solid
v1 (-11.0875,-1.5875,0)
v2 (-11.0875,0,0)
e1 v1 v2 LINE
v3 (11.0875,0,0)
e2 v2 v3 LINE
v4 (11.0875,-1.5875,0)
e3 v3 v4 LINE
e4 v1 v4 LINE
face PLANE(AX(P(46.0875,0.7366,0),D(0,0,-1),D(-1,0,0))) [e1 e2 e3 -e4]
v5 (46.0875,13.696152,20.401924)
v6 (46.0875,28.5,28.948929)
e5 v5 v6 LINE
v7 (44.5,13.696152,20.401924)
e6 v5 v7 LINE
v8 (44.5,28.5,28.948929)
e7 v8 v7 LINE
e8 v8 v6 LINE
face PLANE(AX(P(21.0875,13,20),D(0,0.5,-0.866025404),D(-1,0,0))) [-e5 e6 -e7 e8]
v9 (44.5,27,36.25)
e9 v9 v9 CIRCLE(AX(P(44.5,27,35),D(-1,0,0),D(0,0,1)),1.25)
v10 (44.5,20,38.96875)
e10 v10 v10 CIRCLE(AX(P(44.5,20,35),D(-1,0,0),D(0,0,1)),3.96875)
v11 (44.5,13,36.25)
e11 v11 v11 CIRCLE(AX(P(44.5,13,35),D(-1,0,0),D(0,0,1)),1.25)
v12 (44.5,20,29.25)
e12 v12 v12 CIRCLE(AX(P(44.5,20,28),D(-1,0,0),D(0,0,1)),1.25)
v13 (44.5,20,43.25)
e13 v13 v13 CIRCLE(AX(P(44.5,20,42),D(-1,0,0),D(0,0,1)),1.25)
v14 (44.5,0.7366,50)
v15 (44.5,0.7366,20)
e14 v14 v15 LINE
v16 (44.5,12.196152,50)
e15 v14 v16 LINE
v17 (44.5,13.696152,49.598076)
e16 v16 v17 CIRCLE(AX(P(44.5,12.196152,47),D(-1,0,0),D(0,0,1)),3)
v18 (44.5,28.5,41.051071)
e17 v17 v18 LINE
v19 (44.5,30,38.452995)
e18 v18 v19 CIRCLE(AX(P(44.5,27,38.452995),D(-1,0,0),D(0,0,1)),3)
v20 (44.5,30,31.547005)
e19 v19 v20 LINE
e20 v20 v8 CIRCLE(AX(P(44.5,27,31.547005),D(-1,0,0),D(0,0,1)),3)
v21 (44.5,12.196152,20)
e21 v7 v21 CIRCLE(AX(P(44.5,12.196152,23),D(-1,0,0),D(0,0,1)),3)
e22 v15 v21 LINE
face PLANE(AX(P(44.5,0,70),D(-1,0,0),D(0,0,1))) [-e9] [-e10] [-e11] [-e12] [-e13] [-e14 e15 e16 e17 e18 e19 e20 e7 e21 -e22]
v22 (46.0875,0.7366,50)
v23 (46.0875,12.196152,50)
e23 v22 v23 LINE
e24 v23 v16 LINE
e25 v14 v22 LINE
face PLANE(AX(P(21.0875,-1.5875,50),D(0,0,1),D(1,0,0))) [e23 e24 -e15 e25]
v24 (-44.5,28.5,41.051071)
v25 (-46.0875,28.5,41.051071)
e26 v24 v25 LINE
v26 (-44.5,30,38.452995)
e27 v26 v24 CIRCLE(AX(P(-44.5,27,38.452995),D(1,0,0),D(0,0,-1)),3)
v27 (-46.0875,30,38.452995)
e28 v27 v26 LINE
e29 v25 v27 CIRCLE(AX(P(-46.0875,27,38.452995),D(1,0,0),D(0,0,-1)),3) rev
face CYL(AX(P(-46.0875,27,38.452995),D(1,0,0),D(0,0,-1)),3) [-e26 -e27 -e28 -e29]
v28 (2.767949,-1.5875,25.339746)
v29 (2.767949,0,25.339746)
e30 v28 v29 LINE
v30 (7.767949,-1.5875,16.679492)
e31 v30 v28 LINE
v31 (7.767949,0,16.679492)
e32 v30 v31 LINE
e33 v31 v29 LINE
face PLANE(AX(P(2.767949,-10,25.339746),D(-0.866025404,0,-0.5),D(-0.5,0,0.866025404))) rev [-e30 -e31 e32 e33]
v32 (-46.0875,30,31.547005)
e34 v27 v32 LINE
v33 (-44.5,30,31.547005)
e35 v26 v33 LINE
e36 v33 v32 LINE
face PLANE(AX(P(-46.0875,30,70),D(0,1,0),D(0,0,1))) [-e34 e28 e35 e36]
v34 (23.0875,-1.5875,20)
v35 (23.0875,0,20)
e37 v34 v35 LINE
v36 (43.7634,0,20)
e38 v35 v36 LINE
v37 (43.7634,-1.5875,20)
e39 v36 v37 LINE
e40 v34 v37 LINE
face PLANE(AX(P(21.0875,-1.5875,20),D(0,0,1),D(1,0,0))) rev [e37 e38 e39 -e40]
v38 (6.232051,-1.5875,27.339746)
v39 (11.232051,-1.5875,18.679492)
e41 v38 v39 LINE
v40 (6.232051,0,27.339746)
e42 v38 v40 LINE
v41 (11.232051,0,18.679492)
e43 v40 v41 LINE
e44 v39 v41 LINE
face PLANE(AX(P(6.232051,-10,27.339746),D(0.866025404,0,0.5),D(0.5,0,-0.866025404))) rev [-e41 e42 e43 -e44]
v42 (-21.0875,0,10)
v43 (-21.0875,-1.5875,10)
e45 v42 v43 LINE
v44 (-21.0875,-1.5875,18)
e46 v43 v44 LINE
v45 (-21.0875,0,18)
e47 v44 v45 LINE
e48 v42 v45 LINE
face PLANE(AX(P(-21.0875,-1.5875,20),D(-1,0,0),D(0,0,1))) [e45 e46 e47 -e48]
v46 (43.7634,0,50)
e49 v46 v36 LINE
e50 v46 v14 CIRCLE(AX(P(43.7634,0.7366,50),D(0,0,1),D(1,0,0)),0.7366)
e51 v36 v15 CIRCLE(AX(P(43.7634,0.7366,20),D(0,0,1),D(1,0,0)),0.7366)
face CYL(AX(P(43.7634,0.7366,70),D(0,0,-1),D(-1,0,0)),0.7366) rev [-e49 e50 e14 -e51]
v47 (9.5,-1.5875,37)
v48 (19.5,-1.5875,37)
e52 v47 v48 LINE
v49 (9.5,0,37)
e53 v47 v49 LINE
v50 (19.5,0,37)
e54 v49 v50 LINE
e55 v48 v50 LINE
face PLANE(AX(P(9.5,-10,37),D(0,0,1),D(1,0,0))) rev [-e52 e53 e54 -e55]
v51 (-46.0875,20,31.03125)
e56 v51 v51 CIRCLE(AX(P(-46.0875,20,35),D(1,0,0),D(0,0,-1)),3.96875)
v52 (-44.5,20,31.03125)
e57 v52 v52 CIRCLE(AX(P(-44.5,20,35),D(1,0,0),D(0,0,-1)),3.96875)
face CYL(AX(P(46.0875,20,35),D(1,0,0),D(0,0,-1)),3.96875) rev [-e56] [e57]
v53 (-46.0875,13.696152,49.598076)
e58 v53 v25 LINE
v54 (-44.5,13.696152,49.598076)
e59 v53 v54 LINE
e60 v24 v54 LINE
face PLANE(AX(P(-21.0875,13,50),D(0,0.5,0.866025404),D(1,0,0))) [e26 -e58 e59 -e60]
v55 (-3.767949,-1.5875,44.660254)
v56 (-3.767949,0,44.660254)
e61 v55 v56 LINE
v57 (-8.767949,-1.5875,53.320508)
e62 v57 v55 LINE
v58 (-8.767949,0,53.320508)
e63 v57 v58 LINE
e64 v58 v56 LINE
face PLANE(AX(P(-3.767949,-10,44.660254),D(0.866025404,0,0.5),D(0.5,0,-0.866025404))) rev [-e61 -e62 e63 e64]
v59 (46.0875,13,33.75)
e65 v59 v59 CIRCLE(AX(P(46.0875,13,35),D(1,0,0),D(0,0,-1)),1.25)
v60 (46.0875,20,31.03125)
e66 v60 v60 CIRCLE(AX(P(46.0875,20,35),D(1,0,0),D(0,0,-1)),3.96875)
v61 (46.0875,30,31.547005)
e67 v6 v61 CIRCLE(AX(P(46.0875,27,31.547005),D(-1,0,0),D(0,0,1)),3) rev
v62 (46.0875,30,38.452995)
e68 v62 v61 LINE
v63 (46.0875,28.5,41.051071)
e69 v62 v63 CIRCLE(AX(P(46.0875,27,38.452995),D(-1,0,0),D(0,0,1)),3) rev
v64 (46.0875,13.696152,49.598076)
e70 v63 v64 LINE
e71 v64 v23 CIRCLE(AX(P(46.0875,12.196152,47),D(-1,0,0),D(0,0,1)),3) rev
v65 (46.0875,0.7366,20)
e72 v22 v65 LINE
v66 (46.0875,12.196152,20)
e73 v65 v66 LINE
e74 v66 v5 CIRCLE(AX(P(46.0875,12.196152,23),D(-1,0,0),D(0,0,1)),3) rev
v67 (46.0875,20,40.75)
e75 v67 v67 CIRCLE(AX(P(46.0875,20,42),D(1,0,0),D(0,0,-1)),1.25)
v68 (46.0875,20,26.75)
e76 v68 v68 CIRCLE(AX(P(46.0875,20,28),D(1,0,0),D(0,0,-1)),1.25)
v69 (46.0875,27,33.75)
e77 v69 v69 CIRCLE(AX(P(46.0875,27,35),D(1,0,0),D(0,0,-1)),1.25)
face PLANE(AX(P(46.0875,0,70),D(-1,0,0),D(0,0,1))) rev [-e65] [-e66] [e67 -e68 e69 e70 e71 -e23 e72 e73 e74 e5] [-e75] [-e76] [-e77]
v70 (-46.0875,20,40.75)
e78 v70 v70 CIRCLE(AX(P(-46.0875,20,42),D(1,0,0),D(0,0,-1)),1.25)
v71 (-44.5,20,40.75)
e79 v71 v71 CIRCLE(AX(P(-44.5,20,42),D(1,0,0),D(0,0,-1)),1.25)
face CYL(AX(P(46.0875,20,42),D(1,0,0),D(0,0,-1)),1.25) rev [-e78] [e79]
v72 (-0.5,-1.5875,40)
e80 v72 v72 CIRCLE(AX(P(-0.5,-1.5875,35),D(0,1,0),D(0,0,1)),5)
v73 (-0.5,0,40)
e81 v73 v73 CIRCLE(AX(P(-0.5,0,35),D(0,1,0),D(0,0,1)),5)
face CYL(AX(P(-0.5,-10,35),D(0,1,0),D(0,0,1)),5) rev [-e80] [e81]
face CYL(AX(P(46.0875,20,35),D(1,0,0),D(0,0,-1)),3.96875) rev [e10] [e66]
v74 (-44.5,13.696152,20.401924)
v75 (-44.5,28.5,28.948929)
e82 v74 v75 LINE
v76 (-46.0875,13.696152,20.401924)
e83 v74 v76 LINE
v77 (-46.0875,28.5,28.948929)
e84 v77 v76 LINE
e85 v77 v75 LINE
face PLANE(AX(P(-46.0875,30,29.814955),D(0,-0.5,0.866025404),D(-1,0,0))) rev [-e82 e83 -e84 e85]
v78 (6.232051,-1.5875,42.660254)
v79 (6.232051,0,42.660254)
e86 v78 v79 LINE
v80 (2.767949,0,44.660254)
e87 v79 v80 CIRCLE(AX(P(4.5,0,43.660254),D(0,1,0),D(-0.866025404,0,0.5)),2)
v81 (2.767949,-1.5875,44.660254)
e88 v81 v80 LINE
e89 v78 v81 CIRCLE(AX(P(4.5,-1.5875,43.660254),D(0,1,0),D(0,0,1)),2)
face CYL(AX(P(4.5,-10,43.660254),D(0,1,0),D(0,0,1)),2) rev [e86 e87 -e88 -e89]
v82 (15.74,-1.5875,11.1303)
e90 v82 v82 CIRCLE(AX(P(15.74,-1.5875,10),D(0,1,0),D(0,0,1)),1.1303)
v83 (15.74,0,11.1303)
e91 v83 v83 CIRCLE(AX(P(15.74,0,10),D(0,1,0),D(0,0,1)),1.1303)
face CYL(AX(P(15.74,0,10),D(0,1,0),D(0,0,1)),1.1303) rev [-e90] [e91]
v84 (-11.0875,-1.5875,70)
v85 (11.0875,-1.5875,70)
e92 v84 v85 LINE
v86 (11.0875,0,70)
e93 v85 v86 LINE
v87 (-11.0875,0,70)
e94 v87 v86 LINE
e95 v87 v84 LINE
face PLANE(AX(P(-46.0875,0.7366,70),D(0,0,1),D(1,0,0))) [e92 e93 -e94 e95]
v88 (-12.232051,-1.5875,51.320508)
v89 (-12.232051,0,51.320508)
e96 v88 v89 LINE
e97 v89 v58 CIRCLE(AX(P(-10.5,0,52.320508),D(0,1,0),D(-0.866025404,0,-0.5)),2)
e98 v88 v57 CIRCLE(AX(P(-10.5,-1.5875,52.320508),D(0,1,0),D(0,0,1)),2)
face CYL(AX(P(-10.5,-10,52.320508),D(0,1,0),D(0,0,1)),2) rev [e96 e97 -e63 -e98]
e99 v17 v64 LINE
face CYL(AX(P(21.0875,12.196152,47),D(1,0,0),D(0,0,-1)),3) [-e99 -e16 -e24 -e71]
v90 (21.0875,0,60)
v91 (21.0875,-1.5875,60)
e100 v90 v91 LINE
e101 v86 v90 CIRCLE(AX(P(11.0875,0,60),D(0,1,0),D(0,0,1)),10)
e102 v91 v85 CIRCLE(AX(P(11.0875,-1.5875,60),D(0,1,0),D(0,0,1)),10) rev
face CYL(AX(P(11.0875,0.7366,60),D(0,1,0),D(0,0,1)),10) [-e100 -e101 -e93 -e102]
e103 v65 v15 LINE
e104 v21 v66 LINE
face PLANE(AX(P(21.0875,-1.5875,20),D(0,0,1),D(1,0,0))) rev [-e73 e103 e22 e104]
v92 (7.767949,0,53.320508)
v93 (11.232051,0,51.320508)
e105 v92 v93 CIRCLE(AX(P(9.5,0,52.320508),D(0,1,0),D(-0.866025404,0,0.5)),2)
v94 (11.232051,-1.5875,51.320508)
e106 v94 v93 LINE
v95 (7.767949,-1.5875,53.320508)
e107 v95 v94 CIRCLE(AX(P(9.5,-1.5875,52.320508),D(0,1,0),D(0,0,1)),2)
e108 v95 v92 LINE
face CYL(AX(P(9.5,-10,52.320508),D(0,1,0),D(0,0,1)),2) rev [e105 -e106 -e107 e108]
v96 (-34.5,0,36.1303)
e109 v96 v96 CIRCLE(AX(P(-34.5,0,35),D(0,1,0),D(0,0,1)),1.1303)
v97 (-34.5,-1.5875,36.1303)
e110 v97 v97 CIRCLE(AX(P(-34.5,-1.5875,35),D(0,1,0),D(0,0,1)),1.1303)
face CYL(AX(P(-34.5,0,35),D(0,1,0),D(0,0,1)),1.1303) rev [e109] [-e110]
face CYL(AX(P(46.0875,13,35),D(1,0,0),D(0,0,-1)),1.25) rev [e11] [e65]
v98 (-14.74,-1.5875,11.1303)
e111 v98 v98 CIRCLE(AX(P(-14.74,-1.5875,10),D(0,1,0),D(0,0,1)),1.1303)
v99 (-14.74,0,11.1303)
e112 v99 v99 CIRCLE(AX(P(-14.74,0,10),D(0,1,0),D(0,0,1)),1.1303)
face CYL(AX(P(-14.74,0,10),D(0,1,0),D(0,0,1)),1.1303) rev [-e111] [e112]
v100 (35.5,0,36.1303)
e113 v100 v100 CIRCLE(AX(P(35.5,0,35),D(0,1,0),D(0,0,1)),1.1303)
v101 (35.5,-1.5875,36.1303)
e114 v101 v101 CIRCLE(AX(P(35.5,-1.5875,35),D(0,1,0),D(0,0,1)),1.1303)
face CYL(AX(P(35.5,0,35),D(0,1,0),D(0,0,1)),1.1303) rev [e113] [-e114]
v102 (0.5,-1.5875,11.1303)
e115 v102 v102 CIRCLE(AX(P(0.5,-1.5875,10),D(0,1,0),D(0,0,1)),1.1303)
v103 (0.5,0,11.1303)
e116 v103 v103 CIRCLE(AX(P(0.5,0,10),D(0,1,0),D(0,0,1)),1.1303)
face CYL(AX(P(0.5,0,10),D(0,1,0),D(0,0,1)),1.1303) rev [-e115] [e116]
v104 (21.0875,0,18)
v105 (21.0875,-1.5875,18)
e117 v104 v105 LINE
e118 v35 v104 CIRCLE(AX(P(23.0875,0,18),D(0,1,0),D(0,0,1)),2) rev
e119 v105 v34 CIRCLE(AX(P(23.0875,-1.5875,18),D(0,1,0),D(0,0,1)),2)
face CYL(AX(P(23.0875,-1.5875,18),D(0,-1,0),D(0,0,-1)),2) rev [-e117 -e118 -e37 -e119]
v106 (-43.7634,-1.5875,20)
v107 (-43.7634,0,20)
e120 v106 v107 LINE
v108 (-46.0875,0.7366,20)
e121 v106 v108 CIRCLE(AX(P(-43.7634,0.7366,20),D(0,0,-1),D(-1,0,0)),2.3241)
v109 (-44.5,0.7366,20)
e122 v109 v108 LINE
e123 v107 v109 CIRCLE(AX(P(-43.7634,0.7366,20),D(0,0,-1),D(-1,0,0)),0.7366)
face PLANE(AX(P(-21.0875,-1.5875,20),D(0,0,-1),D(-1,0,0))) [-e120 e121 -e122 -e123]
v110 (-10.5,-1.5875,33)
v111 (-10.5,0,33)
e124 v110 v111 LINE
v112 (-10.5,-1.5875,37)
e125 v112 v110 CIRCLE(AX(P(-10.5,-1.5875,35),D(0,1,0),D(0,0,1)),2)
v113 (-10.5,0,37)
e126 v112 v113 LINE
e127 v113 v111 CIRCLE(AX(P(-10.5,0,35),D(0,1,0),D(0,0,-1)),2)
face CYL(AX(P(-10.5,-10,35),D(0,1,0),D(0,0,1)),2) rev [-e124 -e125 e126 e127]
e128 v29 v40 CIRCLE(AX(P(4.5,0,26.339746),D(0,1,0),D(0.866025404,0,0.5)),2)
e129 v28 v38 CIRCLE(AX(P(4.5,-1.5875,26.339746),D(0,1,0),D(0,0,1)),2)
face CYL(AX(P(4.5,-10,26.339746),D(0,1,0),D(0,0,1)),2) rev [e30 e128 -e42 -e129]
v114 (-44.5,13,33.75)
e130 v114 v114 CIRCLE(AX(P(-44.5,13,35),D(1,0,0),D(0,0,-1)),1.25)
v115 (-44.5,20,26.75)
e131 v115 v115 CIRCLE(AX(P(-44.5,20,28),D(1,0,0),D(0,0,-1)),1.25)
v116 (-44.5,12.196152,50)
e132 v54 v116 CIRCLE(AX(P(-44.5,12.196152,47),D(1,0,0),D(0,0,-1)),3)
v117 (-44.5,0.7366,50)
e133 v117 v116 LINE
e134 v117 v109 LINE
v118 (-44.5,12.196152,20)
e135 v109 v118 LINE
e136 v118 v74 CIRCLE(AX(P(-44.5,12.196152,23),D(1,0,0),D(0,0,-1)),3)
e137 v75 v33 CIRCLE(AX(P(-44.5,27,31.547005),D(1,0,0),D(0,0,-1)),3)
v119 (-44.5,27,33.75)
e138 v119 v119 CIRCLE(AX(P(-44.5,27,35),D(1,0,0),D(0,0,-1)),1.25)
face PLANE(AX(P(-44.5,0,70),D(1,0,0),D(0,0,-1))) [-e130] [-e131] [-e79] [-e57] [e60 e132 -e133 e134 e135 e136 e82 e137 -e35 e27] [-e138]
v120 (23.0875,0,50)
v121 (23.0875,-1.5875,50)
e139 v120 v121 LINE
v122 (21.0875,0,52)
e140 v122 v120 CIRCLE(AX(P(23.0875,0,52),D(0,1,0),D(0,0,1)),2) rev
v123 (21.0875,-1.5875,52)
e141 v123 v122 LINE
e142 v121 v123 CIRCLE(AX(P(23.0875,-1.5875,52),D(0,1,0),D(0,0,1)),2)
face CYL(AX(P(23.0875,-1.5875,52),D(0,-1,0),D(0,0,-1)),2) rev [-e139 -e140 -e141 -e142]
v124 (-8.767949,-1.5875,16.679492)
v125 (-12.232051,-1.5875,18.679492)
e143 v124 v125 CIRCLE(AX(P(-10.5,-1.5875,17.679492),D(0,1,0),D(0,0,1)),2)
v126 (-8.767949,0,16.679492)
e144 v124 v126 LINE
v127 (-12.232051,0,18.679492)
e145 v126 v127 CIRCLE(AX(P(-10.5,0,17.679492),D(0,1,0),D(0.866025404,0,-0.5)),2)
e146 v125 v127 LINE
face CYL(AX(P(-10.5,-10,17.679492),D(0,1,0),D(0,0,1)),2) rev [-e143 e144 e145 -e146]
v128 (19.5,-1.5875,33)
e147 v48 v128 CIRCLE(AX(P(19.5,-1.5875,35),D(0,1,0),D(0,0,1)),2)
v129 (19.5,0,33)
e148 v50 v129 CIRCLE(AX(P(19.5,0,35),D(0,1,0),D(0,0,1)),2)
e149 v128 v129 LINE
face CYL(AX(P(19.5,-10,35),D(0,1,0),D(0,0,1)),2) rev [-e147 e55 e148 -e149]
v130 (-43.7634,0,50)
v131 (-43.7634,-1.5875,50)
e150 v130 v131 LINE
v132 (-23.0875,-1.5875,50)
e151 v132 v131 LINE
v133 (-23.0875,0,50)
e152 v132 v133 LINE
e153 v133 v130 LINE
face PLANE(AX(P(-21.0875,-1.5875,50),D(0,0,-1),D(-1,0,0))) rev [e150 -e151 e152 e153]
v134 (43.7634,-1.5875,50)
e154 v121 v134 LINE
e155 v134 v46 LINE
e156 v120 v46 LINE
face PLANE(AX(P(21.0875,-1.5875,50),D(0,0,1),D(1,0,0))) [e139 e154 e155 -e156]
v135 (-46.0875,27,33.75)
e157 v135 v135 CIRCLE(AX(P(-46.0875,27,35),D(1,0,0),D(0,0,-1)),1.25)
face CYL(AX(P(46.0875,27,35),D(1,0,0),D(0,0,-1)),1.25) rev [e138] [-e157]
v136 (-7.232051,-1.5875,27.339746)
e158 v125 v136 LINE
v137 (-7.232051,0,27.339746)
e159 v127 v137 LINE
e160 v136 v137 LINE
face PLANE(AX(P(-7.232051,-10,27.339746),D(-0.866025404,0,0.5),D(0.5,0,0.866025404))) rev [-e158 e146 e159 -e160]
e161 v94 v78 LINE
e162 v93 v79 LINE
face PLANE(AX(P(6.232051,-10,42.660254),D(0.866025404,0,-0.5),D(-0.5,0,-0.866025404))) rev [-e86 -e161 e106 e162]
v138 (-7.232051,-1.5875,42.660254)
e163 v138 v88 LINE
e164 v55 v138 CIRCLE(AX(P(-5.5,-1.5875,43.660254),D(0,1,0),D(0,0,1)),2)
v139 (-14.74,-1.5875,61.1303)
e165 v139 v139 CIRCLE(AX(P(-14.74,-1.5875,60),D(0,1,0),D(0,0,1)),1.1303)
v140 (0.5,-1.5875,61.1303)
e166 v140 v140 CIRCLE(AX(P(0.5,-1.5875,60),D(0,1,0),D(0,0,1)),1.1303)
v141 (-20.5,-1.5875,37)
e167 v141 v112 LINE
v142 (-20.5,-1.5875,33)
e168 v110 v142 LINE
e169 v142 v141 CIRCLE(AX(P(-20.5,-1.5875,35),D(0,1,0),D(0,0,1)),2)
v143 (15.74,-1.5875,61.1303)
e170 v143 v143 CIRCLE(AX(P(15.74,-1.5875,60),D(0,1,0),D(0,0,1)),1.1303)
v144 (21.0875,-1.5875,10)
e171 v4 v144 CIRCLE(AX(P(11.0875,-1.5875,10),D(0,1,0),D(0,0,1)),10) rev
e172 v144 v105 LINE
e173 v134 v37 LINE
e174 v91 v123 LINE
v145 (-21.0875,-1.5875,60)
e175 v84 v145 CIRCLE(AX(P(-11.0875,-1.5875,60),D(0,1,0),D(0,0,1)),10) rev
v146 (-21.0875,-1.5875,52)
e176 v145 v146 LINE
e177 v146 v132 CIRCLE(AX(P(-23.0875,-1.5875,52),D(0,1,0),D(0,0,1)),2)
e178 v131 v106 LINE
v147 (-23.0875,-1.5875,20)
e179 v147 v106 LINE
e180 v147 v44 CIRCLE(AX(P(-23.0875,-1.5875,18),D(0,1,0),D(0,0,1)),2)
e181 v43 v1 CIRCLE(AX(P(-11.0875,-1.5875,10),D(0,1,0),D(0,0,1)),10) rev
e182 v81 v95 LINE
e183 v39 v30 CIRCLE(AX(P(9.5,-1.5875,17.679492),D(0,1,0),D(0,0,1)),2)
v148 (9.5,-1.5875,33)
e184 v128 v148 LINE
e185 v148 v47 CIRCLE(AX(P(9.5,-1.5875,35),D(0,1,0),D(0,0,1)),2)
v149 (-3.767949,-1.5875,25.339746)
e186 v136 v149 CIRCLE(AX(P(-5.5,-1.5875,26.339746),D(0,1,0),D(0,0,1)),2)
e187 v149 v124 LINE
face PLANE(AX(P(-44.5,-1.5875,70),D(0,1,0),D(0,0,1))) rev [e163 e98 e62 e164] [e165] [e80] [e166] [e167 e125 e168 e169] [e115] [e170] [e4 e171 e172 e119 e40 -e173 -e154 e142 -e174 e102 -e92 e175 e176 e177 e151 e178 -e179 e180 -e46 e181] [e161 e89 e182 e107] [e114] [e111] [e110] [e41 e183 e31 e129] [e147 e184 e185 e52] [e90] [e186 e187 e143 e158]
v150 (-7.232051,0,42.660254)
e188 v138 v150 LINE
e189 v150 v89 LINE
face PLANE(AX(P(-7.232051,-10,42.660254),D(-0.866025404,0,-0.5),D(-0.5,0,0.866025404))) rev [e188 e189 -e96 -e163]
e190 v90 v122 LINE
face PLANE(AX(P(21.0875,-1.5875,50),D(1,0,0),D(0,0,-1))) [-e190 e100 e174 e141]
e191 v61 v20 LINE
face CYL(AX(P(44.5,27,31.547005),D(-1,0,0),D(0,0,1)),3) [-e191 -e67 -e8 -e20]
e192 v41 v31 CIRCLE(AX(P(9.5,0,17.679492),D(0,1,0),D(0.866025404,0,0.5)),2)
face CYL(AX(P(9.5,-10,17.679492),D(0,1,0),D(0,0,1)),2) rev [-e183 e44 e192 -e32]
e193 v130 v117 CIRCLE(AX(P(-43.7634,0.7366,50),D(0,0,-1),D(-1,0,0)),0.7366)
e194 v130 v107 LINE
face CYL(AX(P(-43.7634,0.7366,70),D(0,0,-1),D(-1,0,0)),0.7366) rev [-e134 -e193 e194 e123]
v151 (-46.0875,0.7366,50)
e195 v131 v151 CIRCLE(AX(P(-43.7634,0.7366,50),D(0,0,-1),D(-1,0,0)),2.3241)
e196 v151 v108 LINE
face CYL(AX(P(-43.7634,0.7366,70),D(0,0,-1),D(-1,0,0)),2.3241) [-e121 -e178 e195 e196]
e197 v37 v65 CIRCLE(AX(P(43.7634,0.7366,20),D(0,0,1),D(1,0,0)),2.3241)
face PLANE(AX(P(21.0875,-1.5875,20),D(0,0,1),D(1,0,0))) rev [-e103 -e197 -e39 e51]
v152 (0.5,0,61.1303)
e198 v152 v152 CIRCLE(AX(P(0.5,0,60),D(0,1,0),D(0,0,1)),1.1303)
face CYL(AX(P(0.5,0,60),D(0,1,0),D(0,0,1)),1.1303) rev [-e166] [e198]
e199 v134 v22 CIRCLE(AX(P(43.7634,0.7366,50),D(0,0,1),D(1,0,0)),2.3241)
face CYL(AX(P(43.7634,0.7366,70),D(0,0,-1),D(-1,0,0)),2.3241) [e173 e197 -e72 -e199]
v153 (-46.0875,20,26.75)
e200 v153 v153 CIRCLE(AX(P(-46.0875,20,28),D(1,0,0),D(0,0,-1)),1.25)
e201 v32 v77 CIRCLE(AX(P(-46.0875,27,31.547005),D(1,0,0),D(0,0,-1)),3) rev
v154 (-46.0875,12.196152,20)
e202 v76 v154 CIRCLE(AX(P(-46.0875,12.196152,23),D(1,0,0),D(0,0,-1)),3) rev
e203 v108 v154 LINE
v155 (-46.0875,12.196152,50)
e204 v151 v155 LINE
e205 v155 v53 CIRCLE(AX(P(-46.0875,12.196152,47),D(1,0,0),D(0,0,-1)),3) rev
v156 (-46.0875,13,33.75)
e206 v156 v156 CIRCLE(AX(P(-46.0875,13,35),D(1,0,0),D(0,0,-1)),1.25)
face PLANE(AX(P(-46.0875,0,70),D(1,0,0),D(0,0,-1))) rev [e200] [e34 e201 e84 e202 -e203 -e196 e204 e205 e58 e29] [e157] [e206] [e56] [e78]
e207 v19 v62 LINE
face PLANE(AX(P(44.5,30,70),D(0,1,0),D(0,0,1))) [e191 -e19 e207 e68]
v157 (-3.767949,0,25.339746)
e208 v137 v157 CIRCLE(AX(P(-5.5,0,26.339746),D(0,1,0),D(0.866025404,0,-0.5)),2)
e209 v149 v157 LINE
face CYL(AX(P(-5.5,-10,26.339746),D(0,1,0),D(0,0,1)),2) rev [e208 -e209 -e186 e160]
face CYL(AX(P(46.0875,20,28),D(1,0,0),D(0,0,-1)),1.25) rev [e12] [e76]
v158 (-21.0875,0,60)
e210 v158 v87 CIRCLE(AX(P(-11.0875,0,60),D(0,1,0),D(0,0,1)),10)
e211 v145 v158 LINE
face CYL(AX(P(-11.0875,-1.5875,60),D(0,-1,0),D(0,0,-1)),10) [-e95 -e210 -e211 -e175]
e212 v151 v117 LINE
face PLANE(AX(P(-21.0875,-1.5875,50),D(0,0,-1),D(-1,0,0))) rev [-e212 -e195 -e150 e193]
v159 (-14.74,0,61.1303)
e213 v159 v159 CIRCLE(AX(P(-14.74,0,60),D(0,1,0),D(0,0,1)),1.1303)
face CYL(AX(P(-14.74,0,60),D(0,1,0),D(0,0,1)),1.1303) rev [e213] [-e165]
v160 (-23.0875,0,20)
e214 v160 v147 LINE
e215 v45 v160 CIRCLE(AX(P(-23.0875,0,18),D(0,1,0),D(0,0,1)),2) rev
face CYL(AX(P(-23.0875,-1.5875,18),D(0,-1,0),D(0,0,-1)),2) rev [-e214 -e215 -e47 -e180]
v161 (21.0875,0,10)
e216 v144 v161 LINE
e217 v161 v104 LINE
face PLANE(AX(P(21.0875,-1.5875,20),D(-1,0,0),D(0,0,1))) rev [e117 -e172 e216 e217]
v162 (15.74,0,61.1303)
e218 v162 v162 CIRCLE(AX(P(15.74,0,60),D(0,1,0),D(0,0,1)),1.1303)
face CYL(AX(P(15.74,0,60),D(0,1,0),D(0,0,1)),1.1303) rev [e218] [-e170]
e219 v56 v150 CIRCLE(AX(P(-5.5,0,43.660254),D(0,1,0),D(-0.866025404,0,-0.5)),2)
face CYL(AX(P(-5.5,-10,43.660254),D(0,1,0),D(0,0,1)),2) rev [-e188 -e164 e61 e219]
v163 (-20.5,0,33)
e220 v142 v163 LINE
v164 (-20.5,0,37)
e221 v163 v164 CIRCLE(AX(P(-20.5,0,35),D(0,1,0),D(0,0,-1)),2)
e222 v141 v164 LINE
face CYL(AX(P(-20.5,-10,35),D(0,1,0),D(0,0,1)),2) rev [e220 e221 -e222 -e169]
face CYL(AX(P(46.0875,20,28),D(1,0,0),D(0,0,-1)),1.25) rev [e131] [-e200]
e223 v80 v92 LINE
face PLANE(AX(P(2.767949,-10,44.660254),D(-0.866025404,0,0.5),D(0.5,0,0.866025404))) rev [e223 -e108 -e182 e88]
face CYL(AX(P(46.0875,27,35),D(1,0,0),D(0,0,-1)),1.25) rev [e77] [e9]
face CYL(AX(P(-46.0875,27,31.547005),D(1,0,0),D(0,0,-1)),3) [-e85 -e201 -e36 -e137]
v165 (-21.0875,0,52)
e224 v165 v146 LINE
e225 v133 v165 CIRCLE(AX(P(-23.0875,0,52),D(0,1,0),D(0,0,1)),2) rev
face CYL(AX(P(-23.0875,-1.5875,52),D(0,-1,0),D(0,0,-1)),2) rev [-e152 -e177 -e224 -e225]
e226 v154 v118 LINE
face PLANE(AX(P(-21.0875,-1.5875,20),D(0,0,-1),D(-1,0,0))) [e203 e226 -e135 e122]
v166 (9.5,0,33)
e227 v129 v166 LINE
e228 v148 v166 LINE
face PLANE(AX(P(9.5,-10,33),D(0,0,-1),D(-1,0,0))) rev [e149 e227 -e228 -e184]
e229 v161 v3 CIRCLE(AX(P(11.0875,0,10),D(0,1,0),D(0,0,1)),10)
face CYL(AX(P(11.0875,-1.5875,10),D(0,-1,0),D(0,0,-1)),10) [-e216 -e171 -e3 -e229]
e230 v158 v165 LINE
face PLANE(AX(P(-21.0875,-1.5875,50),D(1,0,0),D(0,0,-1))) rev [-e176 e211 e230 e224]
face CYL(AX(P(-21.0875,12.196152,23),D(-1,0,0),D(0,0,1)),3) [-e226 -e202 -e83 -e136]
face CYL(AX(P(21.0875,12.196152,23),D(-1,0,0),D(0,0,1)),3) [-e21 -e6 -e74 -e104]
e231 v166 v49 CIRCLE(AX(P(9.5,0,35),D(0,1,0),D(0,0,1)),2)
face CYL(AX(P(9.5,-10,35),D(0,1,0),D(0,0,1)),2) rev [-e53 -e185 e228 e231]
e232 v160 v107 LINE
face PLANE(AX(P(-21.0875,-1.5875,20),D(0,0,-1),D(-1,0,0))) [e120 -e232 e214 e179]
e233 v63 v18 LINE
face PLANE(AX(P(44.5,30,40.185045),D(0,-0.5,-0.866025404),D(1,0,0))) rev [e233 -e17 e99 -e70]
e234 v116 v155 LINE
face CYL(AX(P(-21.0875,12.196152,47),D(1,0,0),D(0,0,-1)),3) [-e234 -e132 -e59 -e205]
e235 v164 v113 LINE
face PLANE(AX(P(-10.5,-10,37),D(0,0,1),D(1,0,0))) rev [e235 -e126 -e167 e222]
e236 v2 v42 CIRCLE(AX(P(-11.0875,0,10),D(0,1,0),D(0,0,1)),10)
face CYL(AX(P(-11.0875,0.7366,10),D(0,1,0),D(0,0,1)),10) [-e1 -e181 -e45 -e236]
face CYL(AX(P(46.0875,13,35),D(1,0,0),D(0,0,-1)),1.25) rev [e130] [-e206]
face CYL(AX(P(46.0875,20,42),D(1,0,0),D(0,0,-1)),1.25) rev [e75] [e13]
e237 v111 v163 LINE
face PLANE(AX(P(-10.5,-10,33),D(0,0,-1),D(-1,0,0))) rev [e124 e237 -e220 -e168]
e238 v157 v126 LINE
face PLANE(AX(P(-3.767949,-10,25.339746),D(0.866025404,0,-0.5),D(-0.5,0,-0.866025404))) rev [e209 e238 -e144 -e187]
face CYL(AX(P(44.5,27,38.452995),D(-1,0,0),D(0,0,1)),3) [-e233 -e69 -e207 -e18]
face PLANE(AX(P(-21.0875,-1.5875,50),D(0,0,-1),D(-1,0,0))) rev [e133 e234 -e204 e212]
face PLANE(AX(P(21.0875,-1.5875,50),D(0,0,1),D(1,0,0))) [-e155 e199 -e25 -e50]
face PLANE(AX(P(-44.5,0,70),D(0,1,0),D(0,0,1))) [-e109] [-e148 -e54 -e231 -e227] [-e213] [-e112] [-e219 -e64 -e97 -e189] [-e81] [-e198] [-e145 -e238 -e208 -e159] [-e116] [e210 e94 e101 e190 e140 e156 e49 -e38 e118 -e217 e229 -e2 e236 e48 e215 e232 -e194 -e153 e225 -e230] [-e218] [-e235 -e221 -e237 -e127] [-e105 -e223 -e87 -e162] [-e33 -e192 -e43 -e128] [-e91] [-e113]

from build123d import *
from OCP.BRepFilletAPI import BRepFilletAPI_MakeChamfer

# Parameters (mm, degrees)
BASE_FLANGE1_DEPTH             = 70
SKETCH7_W                      = 25
SKETCH7_H                      = 20
CUT_EXTRUDE1_DEPTH             = 90.017176187
MIRROR10_COPY_1_SKETCH_W       = 25
MIRROR10_COPY_1_SKETCH_H       = 20
MIRROR10_COPY_1_DEPTH          = 90.017176187
FILLET3_R                      = 10
FILLET4_R                      = 2
TAP_DRILL_FOR_4_40_TAP1_D      = 2.2606
SKETCH11_R                     = 5
CUT_EXTRUDE2_DEPTH             = 10
CUT_EXTRUDE3_DEPTH             = 10
CIRPATTERN1_COUNT              = 6
F_5_16_0_3125_DIAMETER_HOLE1_D = 7.9375
TAP_DRILL_FOR_M3X0_5_TAP1_D    = 2.5
CIRPATTERN2_COUNT              = 4
CHAMFER2_SIZE                  = 17
CHAMFER2_SIZE2                 = 9.814954576
FILLET5_R                      = 3
CHAMFER3_SIZE                  = 17
CHAMFER3_SIZE2                 = 9.814954576
FILLET6_R                      = 3


# Sheet-metal steps are written as plain solids
with BuildPart() as part:
    # Sketch2 → Base-Flange1 (new body)
    with BuildSketch(Plane.XY):
        with BuildLine():
            Line((-44.5, 30), (-44.5, 0.7366))
            ThreePointArc((-44.5, 0.7366), (-44.284254855, 0.215745145), (-43.7634, 0))
            Line((-43.7634, 0), (43.7634, 0))
            ThreePointArc((43.7634, 0), (44.284254855, 0.215745145), (44.5, 0.7366))
            Line((44.5, 0.7366), (44.5, 30))
            Line((44.5, 30), (46.0875, 30))
            Line((46.0875, 30), (46.0875, 0.7366))
            ThreePointArc((46.0875, 0.7366), (45.40678687, -0.90678687), (43.7634, -1.5875))
            Line((43.7634, -1.5875), (-43.7634, -1.5875))
            ThreePointArc((-43.7634, -1.5875), (-45.40678687, -0.90678687), (-46.0875, 0.7366))
            Line((-46.0875, 0.7366), (-46.0875, 30))
            Line((-46.0875, 30), (-44.5, 30))
        make_face()
    extrude(amount=BASE_FLANGE1_DEPTH)

    # Sketch7 → Cut-Extrude1 (cut, symmetric)
    with BuildSketch(Plane(origin=(0, 0, 0), x_dir=(1, 0, 0), z_dir=(0, 1, 0))):
        with Locations((-33.5875, -60)):
            Rectangle(SKETCH7_W, SKETCH7_H)
    cut_extrude1 = extrude(amount=CUT_EXTRUDE1_DEPTH, both=True, mode=Mode.SUBTRACT)

    # Mirror9: Cut-Extrude1 across plane
    add(cut_extrude1.mirror(Plane.ZY), mode=Mode.SUBTRACT)

    # Mirror10: Cut-Extrude1 across plane
    add(cut_extrude1.mirror(Plane(origin=(0, 0, 35), x_dir=(1, 0, 0), z_dir=(0, 0, -1))), mode=Mode.SUBTRACT)

    # Mirror10 copy 1 sketch → Mirror10 copy 1 (cut, symmetric)
    with BuildSketch(Plane(origin=(0, 0, 70), x_dir=(-1, 0, 0), z_dir=(0, 1, 0))):
        with Locations((-33.5875, -60)):
            Rectangle(MIRROR10_COPY_1_SKETCH_W, MIRROR10_COPY_1_SKETCH_H)
    extrude(amount=MIRROR10_COPY_1_DEPTH, both=True, mode=Mode.SUBTRACT)

    # Fillet3
    fillet3_edges = [part.edges().sort_by_distance(p)[0] for p in [
        (21.0875, -0.79375, 0),
        (-21.0875, -0.79375, 0),
        (-21.0875, -0.79375, 70),
        (21.0875, -0.79375, 70),
    ]]
    fillet(fillet3_edges, radius=FILLET3_R)

    # Fillet4
    fillet4_edges = [part.edges().sort_by_distance(p)[0] for p in [
        (21.0875, -0.79375, 20),
        (-21.0875, -0.79375, 20),
        (-21.0875, -0.79375, 50),
        (21.0875, -0.79375, 50),
    ]]
    fillet(fillet4_edges, radius=FILLET4_R)

    # Tap Drill for #4-40 Tap1 (through all)
    with Locations(Plane(origin=(0, 0, 0), x_dir=(1, 0, 0), z_dir=(0, 1, 0))):
        with Locations((0.5, -10), (0.5, -60), (-34.5, -35), (35.5, -35), (-14.74, -60), (15.74, -60), (-14.74, -10), (15.74, -10)):
            Hole(TAP_DRILL_FOR_4_40_TAP1_D / 2)

    # Sketch11 → Cut-Extrude2 (cut)
    with BuildSketch(Plane(origin=(0, 0, 0), x_dir=(1, 0, 0), z_dir=(0, 1, 0))):
        with Locations(Location((-0.5, -35, 0), (0, 0, 270))):
            Circle(SKETCH11_R)
    extrude(amount=-CUT_EXTRUDE2_DEPTH, mode=Mode.SUBTRACT)

    # Sketch12 → Cut-Extrude3 (cut)
    with BuildSketch(Plane(origin=(0, 0, 0), x_dir=(1, 0, 0), z_dir=(0, 1, 0))):
        with BuildLine():
            Line((9.5, -33), (19.5, -33))
            ThreePointArc((19.5, -33), (21.5, -35), (19.5, -37))
            Line((19.5, -37), (9.5, -37))
            ThreePointArc((9.5, -37), (7.5, -35), (9.5, -33))
        make_face()
    cut_extrude3 = extrude(amount=-CUT_EXTRUDE3_DEPTH, mode=Mode.SUBTRACT)

    # CirPattern1: Cut-Extrude3 ×6 about axis
    cirpattern1_axis = Axis((-0.5, 0, 35), (0, 1, 0))
    for i in range(1, CIRPATTERN1_COUNT):
        add(cut_extrude3.rotate(cirpattern1_axis, i * 360 / CIRPATTERN1_COUNT), mode=Mode.SUBTRACT)

    # 5/16 (0.3125) Diameter Hole1 (through all)
    with Locations(Plane(origin=(46.0875, 0, 0), x_dir=(0, 0, -1), z_dir=(1, 0, 0))):
        with Locations((-35, 20)):
            Hole(F_5_16_0_3125_DIAMETER_HOLE1_D / 2)

    # Tap Drill for M3x0.5 Tap1 (through all)
    with Locations(Plane(origin=(46.0875, 0, 0), x_dir=(0, 0, -1), z_dir=(1, 0, 0))):
        with Locations((-35, 13)):
            tap_drill_for_m3x0_5_tap1 = Hole(TAP_DRILL_FOR_M3X0_5_TAP1_D / 2)

    # CirPattern2: Tap Drill for M3x0.5 Tap1 ×4 about axis
    cirpattern2_axis = Axis((0, 20, 35), (1, 0, 0))
    for i in range(1, CIRPATTERN2_COUNT):
        add(tap_drill_for_m3x0_5_tap1.rotate(cirpattern2_axis, i * 360 / CIRPATTERN2_COUNT), mode=Mode.SUBTRACT)

    # Chamfer2: one chamfer whose edges measure the first distance from different faces: ONE call of the kernel's chamfer builder (chamfer() names one face for all edges)
    chamfer2_edges_1 = [part.edges().sort_by_distance(p)[0] for p in [
        (45.29375, 30, 20),
    ]]
    chamfer2_side_1 = [part.faces().sort_by_distance(p)[0] for p in [
        (33.42545, -0.390739063, 20),
    ]]
    chamfer2_edges_2 = [part.edges().sort_by_distance(p)[0] for p in [
        (45.29375, 30, 50),
    ]]
    chamfer2_side_2 = [part.faces().sort_by_distance(p)[0] for p in [
        (33.42545, -0.390739063, 50),
    ]]
    chamfer2 = BRepFilletAPI_MakeChamfer(part.part.solid().wrapped)
    for e in chamfer2_edges_1:
        chamfer2.Add(CHAMFER2_SIZE, CHAMFER2_SIZE2, e.wrapped, chamfer2_side_1[0].wrapped)  # the first distance lies on this face
    for e in chamfer2_edges_2:
        chamfer2.Add(CHAMFER2_SIZE, CHAMFER2_SIZE2, e.wrapped, chamfer2_side_2[0].wrapped)  # the first distance lies on this face
    add(Compound.cast(chamfer2.Shape()), mode=Mode.REPLACE)

    # Fillet5
    fillet5_edges = [part.edges().sort_by_distance(p)[0] for p in [
        (45.29375, 13, 20),
        (45.29375, 30, 40.185045424),
        (45.29375, 30, 29.814954576),
        (45.29375, 13, 50),
    ]]
    fillet(fillet5_edges, radius=FILLET5_R)

    # Chamfer3: one chamfer whose edges measure the first distance from different faces: ONE call of the kernel's chamfer builder (chamfer() names one face for all edges)
    chamfer3_edges_1 = [part.edges().sort_by_distance(p)[0] for p in [
        (-45.29375, 30, 20),
    ]]
    chamfer3_side_1 = [part.faces().sort_by_distance(p)[0] for p in [
        (-33.42545, -0.390739063, 20),
    ]]
    chamfer3_edges_2 = [part.edges().sort_by_distance(p)[0] for p in [
        (-45.29375, 30, 50),
    ]]
    chamfer3_side_2 = [part.faces().sort_by_distance(p)[0] for p in [
        (-33.42545, -0.390739063, 50),
    ]]
    chamfer3 = BRepFilletAPI_MakeChamfer(part.part.solid().wrapped)
    for e in chamfer3_edges_1:
        chamfer3.Add(CHAMFER3_SIZE, CHAMFER3_SIZE2, e.wrapped, chamfer3_side_1[0].wrapped)  # the first distance lies on this face
    for e in chamfer3_edges_2:
        chamfer3.Add(CHAMFER3_SIZE, CHAMFER3_SIZE2, e.wrapped, chamfer3_side_2[0].wrapped)  # the first distance lies on this face
    add(Compound.cast(chamfer3.Shape()), mode=Mode.REPLACE)

    # Fillet6
    fillet6_edges = [part.edges().sort_by_distance(p)[0] for p in [
        (-45.29375, 13, 50),
        (-45.29375, 30, 29.814954576),
        (-45.29375, 30, 40.185045424),
        (-45.29375, 13, 20),
    ]]
    fillet(fillet6_edges, radius=FILLET6_R)


solid = part.part
